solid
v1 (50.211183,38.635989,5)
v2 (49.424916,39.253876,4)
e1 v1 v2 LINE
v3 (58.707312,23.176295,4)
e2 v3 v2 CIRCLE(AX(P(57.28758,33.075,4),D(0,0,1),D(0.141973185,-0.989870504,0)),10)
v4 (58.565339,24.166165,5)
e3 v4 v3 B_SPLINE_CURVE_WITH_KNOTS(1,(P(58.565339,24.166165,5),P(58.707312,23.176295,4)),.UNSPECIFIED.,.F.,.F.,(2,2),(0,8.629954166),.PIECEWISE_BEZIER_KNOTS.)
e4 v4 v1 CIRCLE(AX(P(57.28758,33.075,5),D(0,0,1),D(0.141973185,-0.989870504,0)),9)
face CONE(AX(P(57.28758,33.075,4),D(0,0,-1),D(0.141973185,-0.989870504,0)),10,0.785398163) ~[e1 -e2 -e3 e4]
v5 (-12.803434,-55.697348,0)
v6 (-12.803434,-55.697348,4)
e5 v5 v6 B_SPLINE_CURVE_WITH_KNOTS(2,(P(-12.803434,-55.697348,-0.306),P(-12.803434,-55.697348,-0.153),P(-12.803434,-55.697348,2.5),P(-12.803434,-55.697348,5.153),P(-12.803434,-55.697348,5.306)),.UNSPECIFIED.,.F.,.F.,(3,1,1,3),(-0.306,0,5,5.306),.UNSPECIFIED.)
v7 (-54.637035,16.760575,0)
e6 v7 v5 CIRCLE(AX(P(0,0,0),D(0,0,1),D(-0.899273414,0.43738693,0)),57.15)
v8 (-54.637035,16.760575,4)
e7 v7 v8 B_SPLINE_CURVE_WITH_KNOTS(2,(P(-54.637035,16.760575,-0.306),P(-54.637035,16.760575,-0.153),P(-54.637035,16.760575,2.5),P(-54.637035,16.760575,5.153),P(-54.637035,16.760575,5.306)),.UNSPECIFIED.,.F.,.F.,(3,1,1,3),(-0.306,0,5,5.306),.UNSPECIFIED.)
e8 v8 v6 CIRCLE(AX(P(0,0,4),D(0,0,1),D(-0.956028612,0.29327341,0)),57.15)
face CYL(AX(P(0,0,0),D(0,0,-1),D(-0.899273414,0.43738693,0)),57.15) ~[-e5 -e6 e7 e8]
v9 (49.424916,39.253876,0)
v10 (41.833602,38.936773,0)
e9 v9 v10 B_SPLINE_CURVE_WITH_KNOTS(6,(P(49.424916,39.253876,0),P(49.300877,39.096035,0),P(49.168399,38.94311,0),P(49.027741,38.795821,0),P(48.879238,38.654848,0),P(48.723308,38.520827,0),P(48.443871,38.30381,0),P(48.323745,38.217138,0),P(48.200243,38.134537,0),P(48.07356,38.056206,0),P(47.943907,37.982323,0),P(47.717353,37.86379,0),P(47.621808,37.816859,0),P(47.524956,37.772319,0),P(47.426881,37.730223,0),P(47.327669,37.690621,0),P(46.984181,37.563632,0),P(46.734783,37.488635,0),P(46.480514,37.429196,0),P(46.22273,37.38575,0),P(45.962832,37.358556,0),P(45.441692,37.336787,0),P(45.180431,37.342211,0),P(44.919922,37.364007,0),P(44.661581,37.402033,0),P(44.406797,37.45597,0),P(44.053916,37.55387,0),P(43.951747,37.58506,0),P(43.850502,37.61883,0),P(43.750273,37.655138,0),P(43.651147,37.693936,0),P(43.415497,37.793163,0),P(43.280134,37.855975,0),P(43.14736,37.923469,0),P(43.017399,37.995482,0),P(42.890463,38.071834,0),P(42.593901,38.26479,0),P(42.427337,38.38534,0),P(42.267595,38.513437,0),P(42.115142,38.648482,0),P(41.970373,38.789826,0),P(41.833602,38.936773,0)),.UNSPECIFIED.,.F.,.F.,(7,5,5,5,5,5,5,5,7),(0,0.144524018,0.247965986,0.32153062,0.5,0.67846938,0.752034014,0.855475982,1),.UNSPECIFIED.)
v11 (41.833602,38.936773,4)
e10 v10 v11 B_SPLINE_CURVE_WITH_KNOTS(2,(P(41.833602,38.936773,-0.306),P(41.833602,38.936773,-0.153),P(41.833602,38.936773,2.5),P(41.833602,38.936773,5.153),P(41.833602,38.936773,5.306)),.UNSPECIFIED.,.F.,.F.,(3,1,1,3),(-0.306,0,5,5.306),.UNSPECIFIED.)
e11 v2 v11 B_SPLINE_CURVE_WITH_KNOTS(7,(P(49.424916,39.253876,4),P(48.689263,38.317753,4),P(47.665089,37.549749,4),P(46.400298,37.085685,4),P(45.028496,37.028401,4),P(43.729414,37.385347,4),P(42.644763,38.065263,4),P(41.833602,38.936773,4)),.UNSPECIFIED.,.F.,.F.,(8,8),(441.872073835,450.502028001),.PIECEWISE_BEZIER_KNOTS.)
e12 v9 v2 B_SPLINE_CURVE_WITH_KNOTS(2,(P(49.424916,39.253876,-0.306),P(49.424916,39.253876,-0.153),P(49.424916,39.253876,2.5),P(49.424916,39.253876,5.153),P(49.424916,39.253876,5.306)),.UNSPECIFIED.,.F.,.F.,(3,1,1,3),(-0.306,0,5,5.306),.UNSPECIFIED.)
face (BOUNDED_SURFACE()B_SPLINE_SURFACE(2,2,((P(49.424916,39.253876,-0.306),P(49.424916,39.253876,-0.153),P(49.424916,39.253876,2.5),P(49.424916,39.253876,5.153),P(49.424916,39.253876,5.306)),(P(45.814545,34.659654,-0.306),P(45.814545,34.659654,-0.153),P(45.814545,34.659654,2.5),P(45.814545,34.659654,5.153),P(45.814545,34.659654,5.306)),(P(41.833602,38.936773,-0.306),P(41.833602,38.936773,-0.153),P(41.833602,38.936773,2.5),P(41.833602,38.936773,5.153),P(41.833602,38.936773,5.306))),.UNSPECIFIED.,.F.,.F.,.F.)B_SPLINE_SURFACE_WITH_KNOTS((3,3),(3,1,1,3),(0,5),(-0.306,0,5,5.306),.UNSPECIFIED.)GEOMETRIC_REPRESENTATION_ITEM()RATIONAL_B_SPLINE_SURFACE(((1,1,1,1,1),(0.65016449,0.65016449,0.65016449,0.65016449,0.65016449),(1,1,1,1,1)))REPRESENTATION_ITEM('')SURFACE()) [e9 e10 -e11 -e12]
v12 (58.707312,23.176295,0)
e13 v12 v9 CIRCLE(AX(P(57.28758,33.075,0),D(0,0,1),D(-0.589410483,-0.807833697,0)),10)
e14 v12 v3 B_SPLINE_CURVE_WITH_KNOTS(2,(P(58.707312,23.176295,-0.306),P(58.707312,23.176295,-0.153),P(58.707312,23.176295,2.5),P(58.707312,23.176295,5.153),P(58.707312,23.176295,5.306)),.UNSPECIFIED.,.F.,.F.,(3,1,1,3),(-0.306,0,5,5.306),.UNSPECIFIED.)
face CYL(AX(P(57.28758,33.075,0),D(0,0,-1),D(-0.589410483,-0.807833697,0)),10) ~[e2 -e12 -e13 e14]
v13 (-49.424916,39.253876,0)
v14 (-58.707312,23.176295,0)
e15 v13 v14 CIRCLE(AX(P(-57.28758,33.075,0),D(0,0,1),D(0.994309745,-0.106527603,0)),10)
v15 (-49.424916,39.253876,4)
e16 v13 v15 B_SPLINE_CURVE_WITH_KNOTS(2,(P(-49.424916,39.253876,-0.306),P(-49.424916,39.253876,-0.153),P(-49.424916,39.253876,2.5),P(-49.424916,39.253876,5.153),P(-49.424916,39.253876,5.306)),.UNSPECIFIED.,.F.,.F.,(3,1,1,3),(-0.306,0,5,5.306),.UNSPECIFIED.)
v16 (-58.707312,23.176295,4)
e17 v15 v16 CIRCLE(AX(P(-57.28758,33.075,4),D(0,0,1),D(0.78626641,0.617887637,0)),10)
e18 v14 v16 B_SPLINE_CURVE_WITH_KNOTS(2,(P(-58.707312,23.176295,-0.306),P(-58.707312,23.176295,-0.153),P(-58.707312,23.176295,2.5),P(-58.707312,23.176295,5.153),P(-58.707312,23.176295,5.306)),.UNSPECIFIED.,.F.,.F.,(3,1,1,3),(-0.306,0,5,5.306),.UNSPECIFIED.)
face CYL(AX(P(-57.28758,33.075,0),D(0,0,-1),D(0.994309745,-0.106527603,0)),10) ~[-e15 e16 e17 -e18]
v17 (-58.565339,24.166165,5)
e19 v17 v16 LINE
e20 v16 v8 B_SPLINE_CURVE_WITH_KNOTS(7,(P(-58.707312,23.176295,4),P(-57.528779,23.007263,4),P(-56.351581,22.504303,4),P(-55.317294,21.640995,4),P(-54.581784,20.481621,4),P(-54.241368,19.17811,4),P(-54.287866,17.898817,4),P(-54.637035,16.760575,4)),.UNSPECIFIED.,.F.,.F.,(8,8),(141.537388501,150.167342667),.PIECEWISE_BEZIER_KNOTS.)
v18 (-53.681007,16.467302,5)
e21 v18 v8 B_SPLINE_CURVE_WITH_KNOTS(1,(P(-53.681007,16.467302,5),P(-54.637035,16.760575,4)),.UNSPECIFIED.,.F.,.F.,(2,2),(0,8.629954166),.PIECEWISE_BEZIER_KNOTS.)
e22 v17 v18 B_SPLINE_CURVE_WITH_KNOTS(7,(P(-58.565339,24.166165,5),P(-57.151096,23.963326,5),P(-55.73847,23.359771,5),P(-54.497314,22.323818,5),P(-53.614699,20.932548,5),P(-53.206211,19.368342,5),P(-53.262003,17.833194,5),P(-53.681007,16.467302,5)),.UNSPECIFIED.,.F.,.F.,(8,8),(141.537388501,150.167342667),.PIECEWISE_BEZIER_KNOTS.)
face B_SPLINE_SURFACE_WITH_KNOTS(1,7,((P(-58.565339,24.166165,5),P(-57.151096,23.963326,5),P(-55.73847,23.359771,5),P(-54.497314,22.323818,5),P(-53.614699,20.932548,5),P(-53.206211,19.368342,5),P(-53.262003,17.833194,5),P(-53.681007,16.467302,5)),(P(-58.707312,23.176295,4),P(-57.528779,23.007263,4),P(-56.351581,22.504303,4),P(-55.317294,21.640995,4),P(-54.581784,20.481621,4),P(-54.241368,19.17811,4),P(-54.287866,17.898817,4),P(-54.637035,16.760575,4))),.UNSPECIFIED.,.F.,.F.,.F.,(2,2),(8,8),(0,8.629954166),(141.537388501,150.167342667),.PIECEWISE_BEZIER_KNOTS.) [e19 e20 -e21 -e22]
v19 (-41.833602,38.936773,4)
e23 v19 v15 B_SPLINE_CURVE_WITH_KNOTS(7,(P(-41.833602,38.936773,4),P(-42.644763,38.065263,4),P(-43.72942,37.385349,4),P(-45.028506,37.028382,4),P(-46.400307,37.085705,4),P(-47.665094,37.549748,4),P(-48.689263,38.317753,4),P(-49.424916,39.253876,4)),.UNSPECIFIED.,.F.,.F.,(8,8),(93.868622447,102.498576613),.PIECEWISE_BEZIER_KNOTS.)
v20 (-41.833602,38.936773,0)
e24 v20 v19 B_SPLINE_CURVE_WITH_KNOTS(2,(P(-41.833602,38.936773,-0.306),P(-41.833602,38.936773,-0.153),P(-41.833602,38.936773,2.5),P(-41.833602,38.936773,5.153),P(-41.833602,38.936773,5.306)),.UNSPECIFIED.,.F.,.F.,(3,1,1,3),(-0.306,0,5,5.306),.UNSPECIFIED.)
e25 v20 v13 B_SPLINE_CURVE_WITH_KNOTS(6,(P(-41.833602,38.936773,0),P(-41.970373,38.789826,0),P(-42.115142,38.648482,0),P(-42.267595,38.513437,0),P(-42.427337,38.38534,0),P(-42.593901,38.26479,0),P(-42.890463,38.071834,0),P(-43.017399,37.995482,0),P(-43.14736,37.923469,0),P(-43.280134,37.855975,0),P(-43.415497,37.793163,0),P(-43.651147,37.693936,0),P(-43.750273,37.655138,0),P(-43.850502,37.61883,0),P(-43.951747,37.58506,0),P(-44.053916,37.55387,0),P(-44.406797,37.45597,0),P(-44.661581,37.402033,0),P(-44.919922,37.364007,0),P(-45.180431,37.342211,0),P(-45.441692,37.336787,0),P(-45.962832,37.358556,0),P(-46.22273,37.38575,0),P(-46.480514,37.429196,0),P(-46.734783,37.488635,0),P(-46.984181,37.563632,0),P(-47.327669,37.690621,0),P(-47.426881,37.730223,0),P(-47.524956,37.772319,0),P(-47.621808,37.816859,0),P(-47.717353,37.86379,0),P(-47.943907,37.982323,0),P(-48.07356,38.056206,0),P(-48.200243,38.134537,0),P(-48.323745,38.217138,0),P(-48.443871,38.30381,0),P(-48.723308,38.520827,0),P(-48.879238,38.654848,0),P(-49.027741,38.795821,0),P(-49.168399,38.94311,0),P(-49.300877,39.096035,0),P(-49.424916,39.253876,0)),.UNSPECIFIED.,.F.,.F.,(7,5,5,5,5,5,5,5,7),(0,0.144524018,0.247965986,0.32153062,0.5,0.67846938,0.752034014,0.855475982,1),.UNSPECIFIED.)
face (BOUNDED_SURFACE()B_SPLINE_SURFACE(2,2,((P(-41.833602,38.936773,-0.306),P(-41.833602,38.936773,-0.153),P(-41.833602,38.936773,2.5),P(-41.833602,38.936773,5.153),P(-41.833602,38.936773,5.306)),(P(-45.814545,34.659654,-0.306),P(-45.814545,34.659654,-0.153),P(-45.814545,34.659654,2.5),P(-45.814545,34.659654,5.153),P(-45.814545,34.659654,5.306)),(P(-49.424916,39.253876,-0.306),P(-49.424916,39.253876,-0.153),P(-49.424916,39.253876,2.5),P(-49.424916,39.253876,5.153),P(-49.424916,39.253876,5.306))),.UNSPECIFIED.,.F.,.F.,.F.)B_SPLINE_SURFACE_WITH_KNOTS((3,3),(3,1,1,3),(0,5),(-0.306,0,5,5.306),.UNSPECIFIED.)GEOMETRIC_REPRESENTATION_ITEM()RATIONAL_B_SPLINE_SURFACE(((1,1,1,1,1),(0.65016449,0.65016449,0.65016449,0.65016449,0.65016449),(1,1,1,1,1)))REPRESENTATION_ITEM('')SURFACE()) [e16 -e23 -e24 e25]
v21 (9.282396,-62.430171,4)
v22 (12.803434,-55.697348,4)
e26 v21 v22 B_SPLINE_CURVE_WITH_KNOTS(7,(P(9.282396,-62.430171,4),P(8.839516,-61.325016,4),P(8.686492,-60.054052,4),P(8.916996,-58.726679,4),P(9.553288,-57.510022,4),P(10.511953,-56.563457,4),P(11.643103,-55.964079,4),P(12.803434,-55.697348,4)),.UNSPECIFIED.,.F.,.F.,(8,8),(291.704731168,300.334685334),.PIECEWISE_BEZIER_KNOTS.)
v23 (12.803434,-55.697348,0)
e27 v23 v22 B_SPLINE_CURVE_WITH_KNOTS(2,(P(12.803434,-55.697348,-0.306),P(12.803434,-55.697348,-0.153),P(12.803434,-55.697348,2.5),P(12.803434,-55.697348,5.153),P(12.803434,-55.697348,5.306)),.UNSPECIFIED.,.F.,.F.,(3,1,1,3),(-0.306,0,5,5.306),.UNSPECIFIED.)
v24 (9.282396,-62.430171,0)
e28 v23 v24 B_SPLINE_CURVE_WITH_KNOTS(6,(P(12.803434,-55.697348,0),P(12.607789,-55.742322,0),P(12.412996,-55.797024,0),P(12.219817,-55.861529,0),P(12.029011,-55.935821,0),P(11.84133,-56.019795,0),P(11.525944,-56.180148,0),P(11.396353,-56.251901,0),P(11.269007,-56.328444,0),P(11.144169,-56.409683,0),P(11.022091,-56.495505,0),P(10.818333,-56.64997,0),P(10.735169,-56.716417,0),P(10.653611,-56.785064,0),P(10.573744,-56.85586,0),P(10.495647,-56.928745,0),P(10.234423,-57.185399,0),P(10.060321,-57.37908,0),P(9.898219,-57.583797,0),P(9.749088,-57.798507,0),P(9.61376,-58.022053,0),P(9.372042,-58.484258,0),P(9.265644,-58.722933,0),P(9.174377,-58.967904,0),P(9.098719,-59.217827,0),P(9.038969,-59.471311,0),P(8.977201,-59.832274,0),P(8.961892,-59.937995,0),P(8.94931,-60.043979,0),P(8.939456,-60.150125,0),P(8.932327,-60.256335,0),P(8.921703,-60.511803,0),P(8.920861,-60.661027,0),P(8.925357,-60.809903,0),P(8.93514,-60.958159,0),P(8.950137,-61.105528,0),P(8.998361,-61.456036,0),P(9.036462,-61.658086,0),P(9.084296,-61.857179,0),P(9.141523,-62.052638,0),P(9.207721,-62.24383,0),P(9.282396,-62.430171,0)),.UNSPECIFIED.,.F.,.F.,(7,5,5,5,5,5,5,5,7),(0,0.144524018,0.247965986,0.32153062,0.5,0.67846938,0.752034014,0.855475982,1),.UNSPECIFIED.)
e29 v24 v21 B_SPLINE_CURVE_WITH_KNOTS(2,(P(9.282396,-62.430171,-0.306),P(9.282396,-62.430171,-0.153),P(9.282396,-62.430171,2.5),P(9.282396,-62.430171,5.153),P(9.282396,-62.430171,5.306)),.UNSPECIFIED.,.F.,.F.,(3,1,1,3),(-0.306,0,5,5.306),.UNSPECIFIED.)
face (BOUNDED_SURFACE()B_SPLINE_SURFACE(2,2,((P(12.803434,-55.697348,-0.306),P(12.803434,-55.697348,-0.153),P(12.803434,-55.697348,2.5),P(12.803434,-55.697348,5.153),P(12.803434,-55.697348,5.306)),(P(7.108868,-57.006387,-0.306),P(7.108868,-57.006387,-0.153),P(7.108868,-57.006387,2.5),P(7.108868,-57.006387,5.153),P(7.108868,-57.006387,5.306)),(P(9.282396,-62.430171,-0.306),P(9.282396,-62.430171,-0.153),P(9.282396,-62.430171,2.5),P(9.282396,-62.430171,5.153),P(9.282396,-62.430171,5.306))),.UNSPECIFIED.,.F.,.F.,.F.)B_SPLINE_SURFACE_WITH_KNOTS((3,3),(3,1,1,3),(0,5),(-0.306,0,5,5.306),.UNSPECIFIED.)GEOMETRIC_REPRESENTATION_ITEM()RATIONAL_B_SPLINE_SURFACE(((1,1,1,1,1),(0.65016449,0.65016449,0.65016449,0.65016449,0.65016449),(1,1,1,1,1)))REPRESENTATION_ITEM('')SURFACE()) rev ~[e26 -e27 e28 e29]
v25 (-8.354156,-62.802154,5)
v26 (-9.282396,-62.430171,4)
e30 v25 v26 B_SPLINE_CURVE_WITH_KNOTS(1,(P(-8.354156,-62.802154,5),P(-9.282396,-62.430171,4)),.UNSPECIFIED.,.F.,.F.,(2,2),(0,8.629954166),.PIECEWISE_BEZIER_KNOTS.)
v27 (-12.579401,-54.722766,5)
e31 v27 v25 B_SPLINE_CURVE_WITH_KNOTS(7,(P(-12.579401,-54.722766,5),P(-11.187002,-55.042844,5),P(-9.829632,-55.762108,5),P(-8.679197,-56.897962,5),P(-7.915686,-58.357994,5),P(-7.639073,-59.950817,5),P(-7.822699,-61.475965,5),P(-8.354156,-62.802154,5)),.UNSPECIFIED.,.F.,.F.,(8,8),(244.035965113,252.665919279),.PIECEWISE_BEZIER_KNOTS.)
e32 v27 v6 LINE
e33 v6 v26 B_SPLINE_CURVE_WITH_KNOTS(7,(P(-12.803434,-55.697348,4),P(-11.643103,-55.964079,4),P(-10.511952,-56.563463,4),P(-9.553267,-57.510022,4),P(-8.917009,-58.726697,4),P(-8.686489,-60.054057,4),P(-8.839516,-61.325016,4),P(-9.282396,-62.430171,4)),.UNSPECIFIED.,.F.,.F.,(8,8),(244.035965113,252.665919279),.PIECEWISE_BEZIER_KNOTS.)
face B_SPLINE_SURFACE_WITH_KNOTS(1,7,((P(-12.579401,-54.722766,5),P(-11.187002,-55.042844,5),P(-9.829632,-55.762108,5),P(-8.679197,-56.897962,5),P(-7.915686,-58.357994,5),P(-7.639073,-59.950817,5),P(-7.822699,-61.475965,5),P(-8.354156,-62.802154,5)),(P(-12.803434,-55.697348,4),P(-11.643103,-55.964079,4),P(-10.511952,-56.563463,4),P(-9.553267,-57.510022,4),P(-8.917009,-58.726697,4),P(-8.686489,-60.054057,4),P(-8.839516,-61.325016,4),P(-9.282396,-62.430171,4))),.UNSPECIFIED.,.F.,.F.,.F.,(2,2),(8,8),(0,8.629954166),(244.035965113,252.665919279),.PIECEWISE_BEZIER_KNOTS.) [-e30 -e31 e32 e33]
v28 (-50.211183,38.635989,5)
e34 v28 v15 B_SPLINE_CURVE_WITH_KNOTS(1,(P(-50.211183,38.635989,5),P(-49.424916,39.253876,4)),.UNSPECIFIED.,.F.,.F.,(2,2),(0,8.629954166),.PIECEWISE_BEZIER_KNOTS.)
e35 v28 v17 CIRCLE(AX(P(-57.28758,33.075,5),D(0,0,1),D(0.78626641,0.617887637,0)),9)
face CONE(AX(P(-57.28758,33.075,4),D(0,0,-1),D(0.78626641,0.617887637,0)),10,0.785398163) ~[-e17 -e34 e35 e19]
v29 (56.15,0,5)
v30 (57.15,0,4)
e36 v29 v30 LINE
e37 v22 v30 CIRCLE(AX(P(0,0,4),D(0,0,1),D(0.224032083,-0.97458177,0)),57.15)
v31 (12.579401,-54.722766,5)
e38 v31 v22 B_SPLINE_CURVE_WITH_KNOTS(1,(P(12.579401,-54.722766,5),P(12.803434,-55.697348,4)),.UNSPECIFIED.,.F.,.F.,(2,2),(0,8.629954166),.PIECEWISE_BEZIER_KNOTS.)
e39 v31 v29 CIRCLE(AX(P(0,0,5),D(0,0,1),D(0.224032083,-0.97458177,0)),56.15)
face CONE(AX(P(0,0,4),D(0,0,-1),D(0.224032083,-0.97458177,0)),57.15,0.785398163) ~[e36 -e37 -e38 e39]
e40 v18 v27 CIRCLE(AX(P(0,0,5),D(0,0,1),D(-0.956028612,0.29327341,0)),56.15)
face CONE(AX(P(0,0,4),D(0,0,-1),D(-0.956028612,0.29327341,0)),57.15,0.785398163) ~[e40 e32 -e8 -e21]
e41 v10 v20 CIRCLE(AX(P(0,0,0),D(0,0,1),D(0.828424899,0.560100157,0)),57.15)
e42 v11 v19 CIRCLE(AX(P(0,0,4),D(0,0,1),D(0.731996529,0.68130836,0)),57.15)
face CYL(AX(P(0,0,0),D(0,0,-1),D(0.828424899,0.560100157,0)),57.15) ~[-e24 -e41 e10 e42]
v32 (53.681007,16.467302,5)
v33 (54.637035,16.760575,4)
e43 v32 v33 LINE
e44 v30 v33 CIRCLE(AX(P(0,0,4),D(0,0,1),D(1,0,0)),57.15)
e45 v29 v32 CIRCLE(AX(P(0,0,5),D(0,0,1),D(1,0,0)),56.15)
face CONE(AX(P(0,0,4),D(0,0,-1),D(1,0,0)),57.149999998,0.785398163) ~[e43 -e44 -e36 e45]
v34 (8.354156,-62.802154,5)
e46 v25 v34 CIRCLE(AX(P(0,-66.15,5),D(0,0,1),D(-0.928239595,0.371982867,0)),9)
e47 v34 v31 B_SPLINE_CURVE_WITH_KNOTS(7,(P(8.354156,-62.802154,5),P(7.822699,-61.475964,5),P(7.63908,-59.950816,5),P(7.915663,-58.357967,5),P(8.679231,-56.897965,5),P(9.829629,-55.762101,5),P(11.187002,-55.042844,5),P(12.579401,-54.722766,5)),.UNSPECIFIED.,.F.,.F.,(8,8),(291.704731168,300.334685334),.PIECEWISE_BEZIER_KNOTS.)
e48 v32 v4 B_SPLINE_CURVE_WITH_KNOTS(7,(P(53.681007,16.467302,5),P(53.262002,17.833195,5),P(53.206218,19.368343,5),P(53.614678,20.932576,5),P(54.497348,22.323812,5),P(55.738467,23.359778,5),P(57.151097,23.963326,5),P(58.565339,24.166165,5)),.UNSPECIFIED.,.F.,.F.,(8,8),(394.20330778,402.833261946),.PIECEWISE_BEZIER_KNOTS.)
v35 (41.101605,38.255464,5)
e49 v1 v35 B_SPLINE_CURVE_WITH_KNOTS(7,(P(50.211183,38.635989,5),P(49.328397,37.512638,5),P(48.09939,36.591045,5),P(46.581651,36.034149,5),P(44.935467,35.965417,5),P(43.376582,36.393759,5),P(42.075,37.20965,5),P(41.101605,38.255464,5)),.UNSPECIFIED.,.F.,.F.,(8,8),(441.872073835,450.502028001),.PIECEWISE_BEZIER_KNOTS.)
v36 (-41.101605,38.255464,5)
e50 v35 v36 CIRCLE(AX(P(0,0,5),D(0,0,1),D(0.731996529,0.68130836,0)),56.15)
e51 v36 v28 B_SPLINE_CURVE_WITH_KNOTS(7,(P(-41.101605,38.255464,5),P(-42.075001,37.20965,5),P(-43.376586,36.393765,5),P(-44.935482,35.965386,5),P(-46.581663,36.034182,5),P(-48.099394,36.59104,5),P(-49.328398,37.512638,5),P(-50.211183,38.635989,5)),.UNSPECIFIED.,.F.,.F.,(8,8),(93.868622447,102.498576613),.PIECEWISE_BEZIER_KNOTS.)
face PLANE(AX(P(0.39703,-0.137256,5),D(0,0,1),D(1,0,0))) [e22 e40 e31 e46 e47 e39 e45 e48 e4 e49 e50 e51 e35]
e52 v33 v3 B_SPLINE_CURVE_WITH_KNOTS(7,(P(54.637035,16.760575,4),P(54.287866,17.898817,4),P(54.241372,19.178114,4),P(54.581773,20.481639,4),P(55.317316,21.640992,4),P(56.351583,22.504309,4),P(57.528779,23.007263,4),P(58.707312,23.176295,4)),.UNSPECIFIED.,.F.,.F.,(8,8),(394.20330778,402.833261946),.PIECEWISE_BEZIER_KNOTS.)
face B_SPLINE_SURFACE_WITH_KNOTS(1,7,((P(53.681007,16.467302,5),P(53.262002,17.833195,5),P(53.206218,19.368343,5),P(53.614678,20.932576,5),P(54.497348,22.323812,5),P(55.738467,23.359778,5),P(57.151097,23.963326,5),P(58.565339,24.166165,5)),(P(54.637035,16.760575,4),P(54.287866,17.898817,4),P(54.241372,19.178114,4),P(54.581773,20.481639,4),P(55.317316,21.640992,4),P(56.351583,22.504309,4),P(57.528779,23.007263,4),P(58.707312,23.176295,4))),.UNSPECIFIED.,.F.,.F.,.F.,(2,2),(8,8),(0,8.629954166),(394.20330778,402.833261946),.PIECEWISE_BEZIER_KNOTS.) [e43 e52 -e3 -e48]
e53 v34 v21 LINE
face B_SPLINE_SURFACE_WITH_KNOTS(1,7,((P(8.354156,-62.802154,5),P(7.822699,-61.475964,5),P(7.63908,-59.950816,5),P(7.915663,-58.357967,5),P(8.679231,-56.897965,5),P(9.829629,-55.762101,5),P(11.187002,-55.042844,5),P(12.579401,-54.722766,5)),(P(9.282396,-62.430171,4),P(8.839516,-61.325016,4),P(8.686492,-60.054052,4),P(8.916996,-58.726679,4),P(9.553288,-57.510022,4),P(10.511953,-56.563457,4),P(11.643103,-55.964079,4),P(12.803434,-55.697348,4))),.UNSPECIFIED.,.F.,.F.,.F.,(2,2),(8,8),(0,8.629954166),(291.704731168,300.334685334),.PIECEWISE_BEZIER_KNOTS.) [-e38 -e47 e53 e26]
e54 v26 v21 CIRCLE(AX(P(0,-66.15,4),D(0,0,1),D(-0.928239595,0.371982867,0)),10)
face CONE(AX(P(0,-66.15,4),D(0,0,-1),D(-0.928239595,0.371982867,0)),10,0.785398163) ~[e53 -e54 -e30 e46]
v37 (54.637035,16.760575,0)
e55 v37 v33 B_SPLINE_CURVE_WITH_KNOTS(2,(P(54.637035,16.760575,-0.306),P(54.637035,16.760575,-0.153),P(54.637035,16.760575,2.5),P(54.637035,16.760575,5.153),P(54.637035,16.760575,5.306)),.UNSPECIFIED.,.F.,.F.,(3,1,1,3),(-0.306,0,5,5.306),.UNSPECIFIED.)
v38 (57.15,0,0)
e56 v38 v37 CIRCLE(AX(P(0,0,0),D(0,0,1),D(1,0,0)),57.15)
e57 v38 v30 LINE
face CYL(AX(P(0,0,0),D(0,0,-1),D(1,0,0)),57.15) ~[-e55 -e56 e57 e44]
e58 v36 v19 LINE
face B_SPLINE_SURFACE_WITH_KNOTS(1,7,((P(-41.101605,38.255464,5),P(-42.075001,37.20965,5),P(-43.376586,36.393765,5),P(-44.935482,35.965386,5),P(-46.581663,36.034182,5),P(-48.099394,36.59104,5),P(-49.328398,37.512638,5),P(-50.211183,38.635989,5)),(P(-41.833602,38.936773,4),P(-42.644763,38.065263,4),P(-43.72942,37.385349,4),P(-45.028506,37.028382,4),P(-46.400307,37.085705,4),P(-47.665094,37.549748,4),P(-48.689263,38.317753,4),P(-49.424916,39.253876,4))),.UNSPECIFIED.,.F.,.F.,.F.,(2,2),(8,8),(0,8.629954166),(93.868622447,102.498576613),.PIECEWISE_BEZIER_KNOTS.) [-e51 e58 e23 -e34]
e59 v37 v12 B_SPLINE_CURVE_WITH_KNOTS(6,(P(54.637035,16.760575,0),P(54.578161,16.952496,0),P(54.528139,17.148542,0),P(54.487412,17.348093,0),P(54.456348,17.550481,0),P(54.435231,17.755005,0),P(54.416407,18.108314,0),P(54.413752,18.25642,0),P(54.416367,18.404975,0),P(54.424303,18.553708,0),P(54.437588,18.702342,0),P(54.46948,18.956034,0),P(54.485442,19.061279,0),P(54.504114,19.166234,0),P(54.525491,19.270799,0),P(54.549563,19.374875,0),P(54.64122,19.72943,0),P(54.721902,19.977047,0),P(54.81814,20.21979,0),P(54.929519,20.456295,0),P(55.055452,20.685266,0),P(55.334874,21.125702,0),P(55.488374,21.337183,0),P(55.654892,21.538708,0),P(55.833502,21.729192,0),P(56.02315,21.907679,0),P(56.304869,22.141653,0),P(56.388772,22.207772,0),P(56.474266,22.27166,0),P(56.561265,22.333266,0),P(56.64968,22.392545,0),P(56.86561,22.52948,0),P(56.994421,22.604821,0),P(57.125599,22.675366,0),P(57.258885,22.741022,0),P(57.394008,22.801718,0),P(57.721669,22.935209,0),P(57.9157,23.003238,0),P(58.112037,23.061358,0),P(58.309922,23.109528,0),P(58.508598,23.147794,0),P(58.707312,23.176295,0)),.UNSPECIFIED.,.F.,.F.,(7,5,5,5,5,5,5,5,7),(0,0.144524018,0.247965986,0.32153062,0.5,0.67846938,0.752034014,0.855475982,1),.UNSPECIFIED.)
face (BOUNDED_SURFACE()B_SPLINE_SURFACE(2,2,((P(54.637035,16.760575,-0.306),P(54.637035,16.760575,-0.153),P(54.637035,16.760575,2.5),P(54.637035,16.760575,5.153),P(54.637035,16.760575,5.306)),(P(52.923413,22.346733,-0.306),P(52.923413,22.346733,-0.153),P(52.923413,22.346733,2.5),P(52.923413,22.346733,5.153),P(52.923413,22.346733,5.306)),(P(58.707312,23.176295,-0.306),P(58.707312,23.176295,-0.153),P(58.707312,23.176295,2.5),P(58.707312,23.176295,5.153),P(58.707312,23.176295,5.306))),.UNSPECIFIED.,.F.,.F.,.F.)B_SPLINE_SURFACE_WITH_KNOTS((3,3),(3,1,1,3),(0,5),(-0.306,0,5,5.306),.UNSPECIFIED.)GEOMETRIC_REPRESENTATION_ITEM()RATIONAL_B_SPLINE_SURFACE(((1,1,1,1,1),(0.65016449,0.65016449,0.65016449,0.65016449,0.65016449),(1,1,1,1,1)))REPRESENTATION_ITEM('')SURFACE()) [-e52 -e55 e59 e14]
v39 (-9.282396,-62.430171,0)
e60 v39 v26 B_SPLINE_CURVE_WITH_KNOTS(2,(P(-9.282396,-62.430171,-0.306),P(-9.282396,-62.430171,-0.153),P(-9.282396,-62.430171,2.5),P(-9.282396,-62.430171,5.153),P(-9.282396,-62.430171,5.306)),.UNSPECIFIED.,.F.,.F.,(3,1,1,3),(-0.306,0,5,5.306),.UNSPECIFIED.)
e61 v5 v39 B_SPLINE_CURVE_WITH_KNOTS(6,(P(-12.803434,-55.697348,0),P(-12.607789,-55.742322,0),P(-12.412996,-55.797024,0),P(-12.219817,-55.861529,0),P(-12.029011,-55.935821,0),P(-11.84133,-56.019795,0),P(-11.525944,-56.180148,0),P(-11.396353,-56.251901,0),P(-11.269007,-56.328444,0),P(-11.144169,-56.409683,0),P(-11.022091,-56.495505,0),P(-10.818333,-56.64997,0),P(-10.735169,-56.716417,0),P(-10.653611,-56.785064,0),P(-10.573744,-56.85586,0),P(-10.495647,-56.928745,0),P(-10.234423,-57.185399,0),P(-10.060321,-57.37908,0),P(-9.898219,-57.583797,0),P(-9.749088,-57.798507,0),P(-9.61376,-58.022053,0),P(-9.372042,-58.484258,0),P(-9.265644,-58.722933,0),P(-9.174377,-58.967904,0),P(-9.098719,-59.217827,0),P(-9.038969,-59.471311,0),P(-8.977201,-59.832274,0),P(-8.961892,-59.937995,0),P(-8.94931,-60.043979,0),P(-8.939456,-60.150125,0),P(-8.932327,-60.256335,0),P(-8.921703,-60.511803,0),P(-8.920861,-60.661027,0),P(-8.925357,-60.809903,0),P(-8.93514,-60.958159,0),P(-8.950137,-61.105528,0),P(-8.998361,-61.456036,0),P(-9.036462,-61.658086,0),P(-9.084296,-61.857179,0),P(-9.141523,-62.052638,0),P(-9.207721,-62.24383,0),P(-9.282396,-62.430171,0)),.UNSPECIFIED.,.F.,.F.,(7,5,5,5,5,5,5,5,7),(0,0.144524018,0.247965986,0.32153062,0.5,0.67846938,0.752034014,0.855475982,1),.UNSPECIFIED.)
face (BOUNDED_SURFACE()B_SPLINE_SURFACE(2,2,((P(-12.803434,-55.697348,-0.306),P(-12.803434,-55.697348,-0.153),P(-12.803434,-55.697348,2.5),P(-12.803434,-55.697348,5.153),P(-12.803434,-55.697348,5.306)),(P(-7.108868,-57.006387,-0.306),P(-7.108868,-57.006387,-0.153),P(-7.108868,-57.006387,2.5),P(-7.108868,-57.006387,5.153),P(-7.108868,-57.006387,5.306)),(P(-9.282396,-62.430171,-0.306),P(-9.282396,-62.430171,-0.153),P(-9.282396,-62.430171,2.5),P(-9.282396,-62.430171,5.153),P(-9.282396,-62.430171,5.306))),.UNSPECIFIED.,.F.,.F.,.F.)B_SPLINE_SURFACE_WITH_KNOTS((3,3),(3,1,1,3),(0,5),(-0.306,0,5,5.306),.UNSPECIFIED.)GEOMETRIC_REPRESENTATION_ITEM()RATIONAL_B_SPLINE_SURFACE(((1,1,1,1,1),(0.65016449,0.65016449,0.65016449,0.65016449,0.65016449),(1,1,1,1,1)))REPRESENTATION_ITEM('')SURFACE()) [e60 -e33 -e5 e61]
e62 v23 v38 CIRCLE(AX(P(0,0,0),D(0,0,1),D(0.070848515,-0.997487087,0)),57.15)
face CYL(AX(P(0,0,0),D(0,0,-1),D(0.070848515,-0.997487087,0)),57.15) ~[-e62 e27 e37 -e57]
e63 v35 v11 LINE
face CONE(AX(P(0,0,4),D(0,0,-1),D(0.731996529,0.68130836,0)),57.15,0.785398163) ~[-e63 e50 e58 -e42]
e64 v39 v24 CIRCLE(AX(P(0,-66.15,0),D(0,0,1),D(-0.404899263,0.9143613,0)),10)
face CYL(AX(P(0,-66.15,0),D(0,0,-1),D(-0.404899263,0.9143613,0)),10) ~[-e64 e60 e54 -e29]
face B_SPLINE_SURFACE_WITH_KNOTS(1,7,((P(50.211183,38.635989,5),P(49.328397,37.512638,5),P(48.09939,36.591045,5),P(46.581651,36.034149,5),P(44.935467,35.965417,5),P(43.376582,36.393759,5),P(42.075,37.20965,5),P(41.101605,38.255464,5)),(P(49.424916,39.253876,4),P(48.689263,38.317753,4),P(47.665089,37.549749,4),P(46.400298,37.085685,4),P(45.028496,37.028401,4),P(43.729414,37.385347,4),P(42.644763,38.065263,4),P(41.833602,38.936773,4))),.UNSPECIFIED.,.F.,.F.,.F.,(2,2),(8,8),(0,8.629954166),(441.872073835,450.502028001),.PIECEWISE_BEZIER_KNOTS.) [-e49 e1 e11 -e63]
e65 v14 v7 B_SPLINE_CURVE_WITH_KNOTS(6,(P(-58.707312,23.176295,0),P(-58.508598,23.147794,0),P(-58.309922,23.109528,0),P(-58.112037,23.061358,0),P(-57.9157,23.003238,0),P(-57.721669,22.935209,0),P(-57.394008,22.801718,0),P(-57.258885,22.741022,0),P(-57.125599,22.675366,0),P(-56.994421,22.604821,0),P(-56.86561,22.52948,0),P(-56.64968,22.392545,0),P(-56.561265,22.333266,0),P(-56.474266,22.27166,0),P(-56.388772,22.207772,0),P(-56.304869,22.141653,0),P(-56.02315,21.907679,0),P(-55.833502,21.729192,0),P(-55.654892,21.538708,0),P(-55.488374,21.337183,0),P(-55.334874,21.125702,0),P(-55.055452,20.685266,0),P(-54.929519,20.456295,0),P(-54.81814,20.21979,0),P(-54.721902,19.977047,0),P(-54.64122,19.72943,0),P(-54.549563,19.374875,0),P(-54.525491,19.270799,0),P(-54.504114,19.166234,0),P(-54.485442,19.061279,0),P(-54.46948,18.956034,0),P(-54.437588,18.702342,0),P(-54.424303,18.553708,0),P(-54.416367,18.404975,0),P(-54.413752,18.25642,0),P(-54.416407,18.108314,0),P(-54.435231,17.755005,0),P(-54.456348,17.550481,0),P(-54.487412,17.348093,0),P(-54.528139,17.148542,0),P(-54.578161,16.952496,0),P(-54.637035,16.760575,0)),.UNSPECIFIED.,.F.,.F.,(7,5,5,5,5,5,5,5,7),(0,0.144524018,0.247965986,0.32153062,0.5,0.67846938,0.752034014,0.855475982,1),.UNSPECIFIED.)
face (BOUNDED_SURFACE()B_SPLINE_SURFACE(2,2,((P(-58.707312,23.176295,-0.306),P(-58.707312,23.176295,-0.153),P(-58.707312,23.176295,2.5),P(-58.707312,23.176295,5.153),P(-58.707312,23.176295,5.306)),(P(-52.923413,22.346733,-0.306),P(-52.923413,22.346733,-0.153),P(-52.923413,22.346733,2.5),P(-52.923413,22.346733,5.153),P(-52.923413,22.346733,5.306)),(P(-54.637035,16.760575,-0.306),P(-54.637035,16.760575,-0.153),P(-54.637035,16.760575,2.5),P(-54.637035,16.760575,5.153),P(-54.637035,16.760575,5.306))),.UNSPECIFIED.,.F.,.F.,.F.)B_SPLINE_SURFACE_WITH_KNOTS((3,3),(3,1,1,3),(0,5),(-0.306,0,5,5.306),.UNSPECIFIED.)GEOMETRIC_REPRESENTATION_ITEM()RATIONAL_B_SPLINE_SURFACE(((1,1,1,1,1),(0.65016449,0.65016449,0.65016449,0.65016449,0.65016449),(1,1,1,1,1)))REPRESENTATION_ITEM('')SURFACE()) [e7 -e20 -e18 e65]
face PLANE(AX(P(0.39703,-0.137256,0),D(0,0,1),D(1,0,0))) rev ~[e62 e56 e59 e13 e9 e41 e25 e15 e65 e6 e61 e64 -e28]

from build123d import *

# Parameters (mm, degrees)
F1_DEPTH = 5
F2_R     = 5
F3_SIZE  = 1


with BuildPart() as f1:
    # F0 (on Top) → F1 (new body)
    with BuildSketch(Plane.XY):
        with BuildLine():
            ThreePointArc((4.0489926269, -57.0063869992), (41.8181923846, -38.9533218826), (57.15, 0))
            ThreePointArc((57.15, 0), (55.6922778867, 12.8254701198), (51.3934756327, 24.996663025))
            ThreePointArc((51.3934756327, 24.996663025), (49.4933518263, 28.575), (47.3444830059, 32.0097239742))
            ThreePointArc((47.3444830059, 32.0097239742), (0, 57.15), (-47.3444830059, 32.0097239742))
            ThreePointArc((-47.3444830059, 32.0097239742), (-49.4933518263, 28.575), (-51.3934756327, 24.996663025))
            ThreePointArc((-51.3934756327, 24.996663025), (-49.4933518263, -28.575), (-4.0489926269, -57.0063869992))
            ThreePointArc((-4.0489926269, -57.0063869992), (0, -57.15), (4.0489926269, -57.0063869992))
        make_face()
        with BuildLine():
            ThreePointArc((47.3444830059, 32.0097239742), (49.4933518263, 28.575), (51.3934756327, 24.996663025))
            ThreePointArc((51.3934756327, 24.996663025), (65.9478344982, 38.075), (47.3444830059, 32.0097239742))
        make_face()
        with BuildLine():
            ThreePointArc((-51.3934756327, 24.996663025), (-49.4933518263, 28.575), (-47.3444830059, 32.0097239742))
            ThreePointArc((-47.3444830059, 32.0097239742), (-65.9478344982, 38.075), (-51.3934756327, 24.996663025))
        make_face()
        with BuildLine():
            ThreePointArc((-4.0489926269, -57.0063869992), (0, -76.15), (4.0489926269, -57.0063869992))
            ThreePointArc((4.0489926269, -57.0063869992), (0, -57.15), (-4.0489926269, -57.0063869992))
        make_face()
    extrude(amount=F1_DEPTH)

    # F2
    f2_edges = [f1.edges().sort_by_distance(p)[0] for p in [
        (51.393476, 24.996663, 2.5),
        (-4.048993, -57.006387, 2.5),
        (-47.344483, 32.009724, 2.5),
        (47.344483, 32.009724, 2.5),
        (-51.393476, 24.996663, 2.5),
        (4.048993, -57.006387, 2.5),
    ]]
    fillet(f2_edges, radius=F2_R)

    # F3
    f3_edges = [f1.edges().sort_by_distance(p)[0] for p in [
        (0, 57.15, 5),
        (45.702262, 37.347671, 5),
        (-45.702262, 37.347671, 5),
        (65.947834, 38.075, 5),
        (-65.947834, 38.075, 5),
        (55.195163, 20.905484, 5),
        (-55.195163, 20.905484, 5),
        (49.493352, -28.575, 5),
        (-49.493352, -28.575, 5),
        (9.492901, -58.253155, 5),
        (-9.492901, -58.253155, 5),
        (0, -76.15, 5),
    ]]
    chamfer(f3_edges, length=F3_SIZE)


solid = f1.part
